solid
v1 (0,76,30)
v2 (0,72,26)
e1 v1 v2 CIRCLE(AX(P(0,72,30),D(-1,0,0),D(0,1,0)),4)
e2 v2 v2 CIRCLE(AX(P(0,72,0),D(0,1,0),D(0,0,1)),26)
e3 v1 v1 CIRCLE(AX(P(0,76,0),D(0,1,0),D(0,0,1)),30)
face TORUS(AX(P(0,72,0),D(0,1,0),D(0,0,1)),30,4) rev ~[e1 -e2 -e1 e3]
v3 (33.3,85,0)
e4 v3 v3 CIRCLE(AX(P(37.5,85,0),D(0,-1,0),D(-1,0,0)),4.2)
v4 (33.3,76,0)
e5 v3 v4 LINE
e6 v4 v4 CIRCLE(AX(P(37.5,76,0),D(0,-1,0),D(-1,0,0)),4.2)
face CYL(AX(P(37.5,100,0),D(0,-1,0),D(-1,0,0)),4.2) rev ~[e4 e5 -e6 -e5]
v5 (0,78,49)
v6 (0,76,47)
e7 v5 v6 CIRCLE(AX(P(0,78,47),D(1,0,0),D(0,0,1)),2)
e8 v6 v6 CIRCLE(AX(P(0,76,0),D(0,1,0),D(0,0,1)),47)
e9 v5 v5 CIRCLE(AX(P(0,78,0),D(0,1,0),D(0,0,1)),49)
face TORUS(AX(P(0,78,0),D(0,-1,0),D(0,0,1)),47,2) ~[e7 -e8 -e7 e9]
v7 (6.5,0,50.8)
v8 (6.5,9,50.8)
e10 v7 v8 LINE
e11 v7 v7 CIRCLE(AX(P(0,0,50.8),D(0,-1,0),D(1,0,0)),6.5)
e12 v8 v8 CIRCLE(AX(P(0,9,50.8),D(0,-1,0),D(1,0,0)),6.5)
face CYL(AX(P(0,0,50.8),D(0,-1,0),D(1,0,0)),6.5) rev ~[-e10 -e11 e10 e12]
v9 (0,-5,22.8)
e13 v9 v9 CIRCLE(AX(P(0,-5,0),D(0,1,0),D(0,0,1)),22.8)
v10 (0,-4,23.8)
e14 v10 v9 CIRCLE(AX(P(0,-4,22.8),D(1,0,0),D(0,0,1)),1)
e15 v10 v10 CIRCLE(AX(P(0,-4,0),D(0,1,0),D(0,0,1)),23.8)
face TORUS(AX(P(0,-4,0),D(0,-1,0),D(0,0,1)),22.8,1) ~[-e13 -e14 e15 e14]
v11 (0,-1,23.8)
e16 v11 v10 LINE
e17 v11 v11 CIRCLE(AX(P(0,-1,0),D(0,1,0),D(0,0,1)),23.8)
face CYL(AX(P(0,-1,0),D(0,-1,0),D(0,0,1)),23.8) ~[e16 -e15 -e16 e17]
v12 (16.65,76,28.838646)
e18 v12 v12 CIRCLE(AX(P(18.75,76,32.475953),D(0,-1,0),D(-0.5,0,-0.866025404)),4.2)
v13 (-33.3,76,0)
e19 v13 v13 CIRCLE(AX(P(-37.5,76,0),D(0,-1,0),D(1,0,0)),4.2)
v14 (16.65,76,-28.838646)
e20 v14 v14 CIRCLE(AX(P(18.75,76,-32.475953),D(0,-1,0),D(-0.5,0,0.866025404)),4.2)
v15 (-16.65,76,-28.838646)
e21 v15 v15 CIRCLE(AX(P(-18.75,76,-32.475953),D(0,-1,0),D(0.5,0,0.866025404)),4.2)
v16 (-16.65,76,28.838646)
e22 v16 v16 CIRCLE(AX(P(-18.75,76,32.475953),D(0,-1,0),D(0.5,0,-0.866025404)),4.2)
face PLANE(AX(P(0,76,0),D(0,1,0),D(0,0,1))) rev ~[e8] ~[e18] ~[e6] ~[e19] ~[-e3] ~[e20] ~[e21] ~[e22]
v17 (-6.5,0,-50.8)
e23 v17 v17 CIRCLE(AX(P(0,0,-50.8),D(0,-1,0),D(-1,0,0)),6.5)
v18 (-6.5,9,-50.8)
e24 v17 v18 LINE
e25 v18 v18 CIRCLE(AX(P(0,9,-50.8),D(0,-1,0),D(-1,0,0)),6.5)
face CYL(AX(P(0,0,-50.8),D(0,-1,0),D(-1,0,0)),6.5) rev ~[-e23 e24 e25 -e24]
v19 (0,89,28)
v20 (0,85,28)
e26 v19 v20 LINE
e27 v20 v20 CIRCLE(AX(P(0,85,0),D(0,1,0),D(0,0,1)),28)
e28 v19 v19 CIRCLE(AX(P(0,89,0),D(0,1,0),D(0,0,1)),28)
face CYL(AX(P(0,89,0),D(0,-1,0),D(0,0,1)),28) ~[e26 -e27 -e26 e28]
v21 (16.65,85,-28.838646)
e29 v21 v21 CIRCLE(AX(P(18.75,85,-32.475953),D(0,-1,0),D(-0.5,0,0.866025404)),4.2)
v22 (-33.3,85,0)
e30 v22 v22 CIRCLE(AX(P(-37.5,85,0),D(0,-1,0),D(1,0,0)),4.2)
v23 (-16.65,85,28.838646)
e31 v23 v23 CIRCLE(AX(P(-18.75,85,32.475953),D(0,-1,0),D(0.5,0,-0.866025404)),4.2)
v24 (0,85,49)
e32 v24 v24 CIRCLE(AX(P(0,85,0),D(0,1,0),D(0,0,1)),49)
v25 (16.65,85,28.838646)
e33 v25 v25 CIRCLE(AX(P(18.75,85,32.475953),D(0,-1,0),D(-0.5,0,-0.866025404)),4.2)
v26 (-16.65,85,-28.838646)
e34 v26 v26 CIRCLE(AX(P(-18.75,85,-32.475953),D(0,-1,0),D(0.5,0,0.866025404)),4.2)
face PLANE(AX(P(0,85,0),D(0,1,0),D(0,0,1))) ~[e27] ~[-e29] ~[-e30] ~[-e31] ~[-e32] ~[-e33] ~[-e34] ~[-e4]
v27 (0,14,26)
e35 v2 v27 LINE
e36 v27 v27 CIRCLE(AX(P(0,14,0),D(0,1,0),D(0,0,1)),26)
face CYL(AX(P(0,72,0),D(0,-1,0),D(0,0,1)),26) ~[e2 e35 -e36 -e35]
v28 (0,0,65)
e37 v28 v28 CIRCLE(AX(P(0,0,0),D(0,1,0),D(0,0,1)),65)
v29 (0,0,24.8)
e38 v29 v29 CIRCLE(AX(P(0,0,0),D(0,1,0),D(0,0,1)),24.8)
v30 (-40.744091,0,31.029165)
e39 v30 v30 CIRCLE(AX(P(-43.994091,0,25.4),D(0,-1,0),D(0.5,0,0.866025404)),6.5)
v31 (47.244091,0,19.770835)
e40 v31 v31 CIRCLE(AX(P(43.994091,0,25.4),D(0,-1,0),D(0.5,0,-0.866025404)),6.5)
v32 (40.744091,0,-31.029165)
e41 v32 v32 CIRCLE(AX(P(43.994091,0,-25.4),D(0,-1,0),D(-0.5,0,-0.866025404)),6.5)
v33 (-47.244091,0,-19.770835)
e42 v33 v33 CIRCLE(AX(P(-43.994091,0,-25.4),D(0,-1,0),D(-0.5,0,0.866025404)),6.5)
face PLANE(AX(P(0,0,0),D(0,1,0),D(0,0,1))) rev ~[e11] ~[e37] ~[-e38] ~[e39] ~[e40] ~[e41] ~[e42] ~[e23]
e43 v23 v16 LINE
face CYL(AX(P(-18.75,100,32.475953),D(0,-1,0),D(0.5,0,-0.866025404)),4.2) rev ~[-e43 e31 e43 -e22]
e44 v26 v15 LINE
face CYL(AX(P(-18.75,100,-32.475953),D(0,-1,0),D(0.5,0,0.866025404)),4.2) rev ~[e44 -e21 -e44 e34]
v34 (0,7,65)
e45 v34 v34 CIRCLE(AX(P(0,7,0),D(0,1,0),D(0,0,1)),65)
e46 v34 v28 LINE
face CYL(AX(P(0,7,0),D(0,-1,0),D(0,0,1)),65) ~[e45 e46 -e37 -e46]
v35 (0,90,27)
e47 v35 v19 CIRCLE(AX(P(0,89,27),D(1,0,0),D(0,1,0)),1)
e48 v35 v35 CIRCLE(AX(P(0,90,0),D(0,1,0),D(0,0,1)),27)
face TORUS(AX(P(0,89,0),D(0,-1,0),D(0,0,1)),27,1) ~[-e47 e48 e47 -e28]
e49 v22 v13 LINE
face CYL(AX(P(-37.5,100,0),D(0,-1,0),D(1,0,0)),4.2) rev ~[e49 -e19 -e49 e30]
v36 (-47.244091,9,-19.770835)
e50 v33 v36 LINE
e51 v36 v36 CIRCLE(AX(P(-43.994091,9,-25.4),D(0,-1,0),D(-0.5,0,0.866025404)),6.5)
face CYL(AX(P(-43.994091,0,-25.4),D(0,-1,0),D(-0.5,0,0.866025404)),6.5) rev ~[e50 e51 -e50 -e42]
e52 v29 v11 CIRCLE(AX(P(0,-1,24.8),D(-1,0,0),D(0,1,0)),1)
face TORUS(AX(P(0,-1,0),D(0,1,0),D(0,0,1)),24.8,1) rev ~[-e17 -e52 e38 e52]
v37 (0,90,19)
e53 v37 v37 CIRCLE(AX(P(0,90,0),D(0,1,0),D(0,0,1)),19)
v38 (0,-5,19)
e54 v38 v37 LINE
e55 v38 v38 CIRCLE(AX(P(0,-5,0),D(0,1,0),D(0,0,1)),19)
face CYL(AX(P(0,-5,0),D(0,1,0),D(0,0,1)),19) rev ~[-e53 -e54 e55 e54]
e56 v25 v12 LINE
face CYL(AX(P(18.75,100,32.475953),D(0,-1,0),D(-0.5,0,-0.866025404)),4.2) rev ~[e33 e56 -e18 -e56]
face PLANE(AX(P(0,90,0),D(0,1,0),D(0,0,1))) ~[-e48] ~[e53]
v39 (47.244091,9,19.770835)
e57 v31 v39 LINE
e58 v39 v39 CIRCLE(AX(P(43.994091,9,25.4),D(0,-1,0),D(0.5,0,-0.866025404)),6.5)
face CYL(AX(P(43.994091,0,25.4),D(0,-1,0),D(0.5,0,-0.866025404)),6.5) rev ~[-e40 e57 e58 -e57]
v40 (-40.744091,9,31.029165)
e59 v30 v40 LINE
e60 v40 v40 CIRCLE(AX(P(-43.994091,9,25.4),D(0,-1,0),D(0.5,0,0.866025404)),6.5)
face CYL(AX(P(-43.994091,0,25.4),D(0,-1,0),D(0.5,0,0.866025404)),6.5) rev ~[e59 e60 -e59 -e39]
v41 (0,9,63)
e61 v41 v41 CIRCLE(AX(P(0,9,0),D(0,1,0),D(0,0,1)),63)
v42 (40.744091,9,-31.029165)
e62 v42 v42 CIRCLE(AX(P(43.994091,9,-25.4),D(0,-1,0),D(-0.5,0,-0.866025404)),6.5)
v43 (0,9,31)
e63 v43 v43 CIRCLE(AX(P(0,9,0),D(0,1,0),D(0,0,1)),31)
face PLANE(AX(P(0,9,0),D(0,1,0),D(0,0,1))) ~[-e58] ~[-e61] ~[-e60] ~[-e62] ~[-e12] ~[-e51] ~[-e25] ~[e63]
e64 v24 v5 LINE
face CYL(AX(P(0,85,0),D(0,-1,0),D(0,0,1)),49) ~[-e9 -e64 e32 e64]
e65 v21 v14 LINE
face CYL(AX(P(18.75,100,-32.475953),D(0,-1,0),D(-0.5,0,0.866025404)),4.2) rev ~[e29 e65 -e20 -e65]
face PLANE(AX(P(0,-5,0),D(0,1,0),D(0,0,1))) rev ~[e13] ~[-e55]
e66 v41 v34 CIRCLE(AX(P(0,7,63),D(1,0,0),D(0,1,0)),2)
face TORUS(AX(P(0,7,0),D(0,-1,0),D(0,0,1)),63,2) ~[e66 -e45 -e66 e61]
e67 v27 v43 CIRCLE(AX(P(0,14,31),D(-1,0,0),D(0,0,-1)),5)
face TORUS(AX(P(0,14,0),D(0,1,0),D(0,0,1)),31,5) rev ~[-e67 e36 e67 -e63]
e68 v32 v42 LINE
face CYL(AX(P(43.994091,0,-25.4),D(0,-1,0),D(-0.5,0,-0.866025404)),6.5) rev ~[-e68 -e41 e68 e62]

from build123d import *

# Parameters (mm, degrees)
F3_D            = 8.4
F3_DEPTH        = 15
F3_TIP          = 2.5236145999
F3_COPIES_COUNT = 6
F4_R            = 6.5
F5_DEPTH        = 18
F5_COPIES_COUNT = 6


# Not quite as in the source:
# - a pattern or mirror of a feature is missing from the dataset's text; its kind, count and spacing are read off the source's solid


with BuildPart() as f1:
    # F0 (on Right) → F1 (revolve)
    with BuildSketch(Plane.YZ):
        with BuildLine():
            Line((89, 28), (85, 28))
            Line((85, 28), (85, 49))
            Line((85, 49), (78, 49))
            ThreePointArc((78, 49), (76.5857864376, 48.4142135624), (76, 47))
            Line((76, 47), (76, 30))
            ThreePointArc((76, 30), (74.8284271247, 27.1715728753), (72, 26))
            Line((72, 26), (14, 26))
            ThreePointArc((14, 26), (10.4644660941, 27.4644660941), (9, 31))
            Line((9, 31), (9, 63))
            ThreePointArc((9, 63), (8.4142135624, 64.4142135624), (7, 65))
            Line((7, 65), (0, 65))
            Line((0, 65), (0, 24.8))
            ThreePointArc((0, 24.8), (-0.2928932188, 24.0928932188), (-1, 23.8))
            Line((-1, 23.8), (-4, 23.8))
            ThreePointArc((-4, 23.8), (-4.7071067812, 23.5071067812), (-5, 22.8))
            Line((-5, 22.8), (-5, 19))
            Line((-5, 19), (0, 19))
            Line((0, 19), (85, 19))
            Line((85, 19), (90, 19))
            Line((90, 19), (90, 27))
            ThreePointArc((90, 27), (89.7071067812, 27.7071067812), (89, 28))
        make_face()
    revolve(axis=Axis((0, 2.4354029447, 0), (0, 1, 0)))

    # F3
    with Locations(Plane(origin=(0, 85, 0), x_dir=(-1, 0, 0), z_dir=(0, 1, 0))):
        with Locations((37.5, 0)):
            f3 = Hole(F3_D / 2, depth=F3_DEPTH)
            with Locations((0, 0, -(F3_DEPTH + F3_TIP / 2))):  # 118° drill point
                Cone(0, F3_D / 2, F3_TIP, mode=Mode.SUBTRACT)

    # F3_copies: F3 ×6 about axis
    f3_copies_axis = Axis((0, 0, 0), (0, 1, 0))
    for i in range(1, F3_COPIES_COUNT):
        add(f3.rotate(f3_copies_axis, i * 360 / F3_COPIES_COUNT), mode=Mode.SUBTRACT)

    # F4 (on Front) → F5 (cut)
    with BuildSketch(Plane.XZ):
        with Locations((0, 50.8)):
            Circle(F4_R)
    f5 = extrude(amount=-F5_DEPTH, mode=Mode.SUBTRACT)

    # F5_copies: F5 ×6 about axis
    f5_copies_axis = Axis((0, 0, 0), (0, 1, 0))
    for i in range(1, F5_COPIES_COUNT):
        add(f5.rotate(f5_copies_axis, i * 360 / F5_COPIES_COUNT), mode=Mode.SUBTRACT)


solid = f1.part
